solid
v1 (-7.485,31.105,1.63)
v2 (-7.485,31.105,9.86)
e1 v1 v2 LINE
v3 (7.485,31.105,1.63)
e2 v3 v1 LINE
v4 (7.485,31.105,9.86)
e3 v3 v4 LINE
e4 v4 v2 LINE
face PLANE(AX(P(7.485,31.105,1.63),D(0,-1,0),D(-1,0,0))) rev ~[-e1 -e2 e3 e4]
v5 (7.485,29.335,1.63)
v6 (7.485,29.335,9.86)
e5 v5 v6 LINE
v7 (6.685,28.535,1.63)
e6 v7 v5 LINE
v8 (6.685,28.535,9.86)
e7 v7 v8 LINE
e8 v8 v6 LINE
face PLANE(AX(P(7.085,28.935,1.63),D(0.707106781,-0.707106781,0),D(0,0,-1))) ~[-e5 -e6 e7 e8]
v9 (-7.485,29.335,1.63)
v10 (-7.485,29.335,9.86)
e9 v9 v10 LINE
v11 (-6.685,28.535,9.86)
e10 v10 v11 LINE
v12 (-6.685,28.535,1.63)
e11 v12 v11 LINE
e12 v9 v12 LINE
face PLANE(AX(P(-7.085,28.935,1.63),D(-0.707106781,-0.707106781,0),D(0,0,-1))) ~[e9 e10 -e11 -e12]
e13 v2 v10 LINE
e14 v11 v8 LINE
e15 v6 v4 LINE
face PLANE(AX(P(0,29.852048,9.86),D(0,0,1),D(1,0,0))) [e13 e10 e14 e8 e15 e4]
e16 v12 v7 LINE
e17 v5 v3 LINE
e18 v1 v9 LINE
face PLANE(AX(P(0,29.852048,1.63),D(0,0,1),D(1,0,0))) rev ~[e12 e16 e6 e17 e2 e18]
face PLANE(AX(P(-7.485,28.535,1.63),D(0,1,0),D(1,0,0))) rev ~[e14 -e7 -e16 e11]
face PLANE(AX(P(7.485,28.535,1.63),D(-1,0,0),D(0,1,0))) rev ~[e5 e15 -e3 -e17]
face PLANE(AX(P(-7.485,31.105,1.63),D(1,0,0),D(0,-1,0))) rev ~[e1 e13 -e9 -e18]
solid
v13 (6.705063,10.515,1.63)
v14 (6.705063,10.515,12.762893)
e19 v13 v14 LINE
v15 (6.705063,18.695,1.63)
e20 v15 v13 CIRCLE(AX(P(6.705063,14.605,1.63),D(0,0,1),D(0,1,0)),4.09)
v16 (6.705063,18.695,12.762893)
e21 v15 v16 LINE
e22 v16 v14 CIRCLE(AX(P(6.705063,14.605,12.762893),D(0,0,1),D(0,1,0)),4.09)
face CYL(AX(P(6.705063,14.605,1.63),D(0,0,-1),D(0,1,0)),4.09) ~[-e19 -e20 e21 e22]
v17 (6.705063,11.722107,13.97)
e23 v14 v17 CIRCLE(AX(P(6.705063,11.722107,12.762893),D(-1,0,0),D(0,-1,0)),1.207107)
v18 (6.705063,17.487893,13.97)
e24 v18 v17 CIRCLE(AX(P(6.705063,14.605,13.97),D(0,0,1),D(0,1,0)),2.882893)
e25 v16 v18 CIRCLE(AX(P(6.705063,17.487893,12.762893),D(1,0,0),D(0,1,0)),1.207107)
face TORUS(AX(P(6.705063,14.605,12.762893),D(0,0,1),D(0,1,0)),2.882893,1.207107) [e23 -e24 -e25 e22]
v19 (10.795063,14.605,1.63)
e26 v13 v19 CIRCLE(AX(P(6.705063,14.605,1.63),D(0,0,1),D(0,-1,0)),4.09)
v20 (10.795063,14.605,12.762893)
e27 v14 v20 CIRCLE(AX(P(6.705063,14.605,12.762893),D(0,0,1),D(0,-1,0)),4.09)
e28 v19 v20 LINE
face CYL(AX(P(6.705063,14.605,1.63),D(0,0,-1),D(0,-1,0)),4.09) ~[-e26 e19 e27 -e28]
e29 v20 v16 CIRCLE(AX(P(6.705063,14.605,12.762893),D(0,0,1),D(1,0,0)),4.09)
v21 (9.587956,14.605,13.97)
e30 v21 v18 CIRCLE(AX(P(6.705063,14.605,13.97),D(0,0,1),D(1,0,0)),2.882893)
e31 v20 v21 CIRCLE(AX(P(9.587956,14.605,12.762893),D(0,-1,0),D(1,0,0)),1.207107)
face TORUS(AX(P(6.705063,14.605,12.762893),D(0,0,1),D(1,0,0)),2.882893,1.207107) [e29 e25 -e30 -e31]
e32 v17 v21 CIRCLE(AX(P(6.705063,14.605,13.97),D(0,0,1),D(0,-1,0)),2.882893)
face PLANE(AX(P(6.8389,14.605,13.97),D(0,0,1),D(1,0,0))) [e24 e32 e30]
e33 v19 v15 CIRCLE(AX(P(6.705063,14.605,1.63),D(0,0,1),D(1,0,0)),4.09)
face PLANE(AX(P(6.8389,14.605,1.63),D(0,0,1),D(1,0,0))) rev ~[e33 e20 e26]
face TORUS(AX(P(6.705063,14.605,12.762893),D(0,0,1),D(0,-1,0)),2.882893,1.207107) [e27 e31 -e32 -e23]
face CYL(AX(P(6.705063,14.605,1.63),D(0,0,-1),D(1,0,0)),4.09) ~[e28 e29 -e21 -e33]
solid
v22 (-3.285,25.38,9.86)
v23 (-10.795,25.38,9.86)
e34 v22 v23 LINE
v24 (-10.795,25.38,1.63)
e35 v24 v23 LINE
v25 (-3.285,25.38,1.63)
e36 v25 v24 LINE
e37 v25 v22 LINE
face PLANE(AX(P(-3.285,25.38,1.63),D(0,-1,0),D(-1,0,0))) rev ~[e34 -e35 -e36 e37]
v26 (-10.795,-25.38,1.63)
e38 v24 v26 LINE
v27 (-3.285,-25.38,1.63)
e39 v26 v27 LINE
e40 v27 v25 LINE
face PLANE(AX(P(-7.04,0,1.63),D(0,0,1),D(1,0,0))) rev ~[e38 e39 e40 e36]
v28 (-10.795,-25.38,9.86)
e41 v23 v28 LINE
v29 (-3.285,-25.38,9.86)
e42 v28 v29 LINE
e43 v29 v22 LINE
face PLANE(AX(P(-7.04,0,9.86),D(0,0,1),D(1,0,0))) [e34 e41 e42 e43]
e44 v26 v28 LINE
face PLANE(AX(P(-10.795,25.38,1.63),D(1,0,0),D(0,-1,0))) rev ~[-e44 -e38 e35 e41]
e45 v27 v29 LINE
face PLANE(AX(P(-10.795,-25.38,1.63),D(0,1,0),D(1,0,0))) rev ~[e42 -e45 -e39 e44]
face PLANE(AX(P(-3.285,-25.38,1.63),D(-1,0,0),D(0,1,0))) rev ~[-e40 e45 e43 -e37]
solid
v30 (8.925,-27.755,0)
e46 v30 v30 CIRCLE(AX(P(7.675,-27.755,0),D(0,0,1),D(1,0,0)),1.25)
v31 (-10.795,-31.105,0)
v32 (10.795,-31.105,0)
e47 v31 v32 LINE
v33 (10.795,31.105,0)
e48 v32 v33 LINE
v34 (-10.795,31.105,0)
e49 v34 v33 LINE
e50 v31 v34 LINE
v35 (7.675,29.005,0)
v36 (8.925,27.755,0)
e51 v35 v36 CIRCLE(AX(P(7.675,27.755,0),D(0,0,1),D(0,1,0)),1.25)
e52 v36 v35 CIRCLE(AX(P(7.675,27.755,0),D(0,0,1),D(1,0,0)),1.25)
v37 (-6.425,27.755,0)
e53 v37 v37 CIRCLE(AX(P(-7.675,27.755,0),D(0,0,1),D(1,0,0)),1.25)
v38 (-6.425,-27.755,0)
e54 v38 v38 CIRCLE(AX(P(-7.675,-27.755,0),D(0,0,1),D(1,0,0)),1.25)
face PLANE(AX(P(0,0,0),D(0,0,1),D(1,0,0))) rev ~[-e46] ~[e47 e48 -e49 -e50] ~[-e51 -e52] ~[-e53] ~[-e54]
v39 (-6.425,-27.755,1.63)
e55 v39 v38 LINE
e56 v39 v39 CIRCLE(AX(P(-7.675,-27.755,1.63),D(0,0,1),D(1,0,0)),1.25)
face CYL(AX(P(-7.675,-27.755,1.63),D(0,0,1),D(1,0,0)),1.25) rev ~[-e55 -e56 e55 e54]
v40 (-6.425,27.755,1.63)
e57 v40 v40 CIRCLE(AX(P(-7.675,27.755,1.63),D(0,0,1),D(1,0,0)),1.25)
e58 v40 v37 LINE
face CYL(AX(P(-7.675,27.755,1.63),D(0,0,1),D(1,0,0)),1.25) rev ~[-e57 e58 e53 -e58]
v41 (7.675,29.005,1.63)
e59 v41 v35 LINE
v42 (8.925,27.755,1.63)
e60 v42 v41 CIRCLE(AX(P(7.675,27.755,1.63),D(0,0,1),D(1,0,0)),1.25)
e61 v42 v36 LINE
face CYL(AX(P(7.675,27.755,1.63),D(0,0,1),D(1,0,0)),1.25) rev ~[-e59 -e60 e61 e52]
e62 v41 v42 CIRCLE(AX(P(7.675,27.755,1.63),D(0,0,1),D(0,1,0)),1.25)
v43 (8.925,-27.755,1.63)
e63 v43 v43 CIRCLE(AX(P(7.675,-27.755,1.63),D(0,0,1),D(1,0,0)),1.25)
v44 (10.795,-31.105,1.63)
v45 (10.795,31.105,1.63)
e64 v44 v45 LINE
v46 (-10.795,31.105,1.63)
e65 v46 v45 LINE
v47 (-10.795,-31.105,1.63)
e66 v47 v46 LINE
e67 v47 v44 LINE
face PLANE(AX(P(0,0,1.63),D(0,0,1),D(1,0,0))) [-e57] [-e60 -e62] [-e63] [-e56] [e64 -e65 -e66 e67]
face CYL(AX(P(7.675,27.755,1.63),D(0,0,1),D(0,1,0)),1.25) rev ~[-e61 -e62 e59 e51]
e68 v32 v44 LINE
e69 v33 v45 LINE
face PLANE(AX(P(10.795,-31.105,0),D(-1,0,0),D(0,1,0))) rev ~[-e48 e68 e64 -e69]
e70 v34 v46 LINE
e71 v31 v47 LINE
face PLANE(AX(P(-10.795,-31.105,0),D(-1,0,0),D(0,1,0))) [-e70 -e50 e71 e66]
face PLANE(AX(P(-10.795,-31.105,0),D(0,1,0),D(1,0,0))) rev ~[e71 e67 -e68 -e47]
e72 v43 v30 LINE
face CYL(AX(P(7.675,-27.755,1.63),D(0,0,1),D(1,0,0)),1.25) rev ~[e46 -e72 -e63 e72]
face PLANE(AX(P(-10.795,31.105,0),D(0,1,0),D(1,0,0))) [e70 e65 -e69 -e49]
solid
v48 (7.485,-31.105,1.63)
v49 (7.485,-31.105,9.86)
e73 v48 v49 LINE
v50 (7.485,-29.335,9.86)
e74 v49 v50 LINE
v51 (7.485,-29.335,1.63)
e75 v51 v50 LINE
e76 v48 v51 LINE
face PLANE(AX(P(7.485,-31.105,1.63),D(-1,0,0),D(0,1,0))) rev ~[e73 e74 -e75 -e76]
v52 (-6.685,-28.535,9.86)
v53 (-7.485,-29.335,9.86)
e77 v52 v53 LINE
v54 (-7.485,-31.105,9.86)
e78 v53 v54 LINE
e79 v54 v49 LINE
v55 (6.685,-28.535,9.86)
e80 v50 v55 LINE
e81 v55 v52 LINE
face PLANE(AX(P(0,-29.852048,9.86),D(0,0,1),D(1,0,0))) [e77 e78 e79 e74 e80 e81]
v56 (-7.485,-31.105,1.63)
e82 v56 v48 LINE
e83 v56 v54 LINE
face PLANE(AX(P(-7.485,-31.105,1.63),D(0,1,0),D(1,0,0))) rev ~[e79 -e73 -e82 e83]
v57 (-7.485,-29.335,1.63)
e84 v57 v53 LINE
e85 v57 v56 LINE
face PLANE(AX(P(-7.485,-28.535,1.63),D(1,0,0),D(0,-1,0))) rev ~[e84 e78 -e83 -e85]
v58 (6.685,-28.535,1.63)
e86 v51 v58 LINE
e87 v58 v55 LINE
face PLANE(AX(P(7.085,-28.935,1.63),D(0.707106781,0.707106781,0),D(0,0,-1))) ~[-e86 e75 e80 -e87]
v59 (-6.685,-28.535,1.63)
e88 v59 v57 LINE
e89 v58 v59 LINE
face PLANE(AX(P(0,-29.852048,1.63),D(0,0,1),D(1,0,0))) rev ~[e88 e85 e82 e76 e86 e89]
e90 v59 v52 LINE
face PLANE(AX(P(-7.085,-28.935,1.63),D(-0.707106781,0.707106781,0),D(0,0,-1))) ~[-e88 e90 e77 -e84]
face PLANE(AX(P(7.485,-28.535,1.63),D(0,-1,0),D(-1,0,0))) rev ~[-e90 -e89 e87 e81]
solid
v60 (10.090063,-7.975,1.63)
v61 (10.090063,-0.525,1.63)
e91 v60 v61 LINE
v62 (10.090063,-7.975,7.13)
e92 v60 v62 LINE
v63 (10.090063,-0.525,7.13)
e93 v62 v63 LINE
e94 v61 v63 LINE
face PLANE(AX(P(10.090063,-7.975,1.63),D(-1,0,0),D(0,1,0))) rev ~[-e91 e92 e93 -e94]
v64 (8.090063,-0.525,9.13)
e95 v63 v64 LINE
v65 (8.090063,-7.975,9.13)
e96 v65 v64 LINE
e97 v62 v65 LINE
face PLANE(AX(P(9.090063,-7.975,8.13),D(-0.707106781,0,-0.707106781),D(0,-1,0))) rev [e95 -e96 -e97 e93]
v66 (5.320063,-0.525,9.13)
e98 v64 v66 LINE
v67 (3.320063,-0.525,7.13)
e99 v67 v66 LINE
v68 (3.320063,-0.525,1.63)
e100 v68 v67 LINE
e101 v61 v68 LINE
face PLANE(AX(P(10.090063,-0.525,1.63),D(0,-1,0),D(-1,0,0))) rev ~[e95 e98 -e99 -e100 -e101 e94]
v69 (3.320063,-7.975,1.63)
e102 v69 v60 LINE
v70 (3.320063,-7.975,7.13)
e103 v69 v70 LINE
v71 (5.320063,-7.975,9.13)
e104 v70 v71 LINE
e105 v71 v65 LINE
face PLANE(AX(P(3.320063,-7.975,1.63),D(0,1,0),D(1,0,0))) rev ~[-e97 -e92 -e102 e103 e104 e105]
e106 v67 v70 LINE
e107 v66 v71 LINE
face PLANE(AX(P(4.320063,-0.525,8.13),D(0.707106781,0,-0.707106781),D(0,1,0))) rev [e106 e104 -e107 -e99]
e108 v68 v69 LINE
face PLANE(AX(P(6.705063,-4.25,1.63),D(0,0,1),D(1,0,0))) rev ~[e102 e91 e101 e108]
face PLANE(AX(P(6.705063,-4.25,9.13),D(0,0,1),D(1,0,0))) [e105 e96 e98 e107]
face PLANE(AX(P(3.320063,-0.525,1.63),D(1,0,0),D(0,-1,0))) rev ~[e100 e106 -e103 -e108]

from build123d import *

# Parameters (mm, degrees)
F0_W       = 21.59
F0_H       = 62.21
F1_DEPTH   = 1.63
F4_DEPTH   = 12.34
F5_DEPTH   = 7.5
F2_R       = 1.25
F6_DEPTH   = 25
F7_SIZE    = 2
F8_R       = 1.2071067812
F10_DEPTH  = 8.23
F12_DEPTH  = 8.23
F13_SIZE   = 0.8
F13_2_SIZE = 0.8


with BuildPart() as f1:
    # F0 (on Top) → F1 (new body)
    with BuildSketch(Plane.XY):
        Rectangle(F0_W, F0_H)
    extrude(amount=F1_DEPTH)

    # F2 (on face) → F6 (cut)
    with BuildSketch(Plane.XY.offset(1.63)):
        with BuildLine():
            ThreePointArc((7.675, 29.005), (6.7911165235, 26.8711165235), (8.925, 27.755))
            Line((8.925, 27.755), (7.675, 27.755))
            Line((7.675, 27.755), (7.675, 29.005))
        make_face()
        with BuildLine():
            Line((7.675, 27.755), (8.925, 27.755))
            ThreePointArc((8.925, 27.755), (8.5588834765, 28.6388834765), (7.675, 29.005))
            Line((7.675, 29.005), (7.675, 27.755))
        make_face()
        with Locations((-7.675, 27.755)):
            Circle(F2_R)
        with Locations((-7.675, -27.755)):
            Circle(F2_R)
        with Locations((7.675, -27.755)):
            Circle(F2_R)
    extrude(amount=-F6_DEPTH, mode=Mode.SUBTRACT)


with BuildPart() as f4:
    # F3 (on face) → F4 (new body)
    with BuildSketch(Plane.XY.offset(1.63)):
        with BuildLine():
            ThreePointArc((10.7950629295, 14.605), (9.5971296646, 17.4970667351), (6.7050629295, 18.695))
            ThreePointArc((6.7050629295, 18.695), (2.6150629295, 14.605), (6.7050629295, 10.515))
            ThreePointArc((6.7050629295, 10.515), (9.5971296646, 11.7129332649), (10.7950629295, 14.605))
        make_face()
    extrude(amount=F4_DEPTH)

    # F8
    f8_edges = [f4.edges().sort_by_distance(p)[0] for p in [
        (6.705063, 18.695, 13.97),
    ]]
    fillet(f8_edges, radius=F8_R)


with BuildPart() as f5:
    # F3 (on face) → F5 (new body)
    with BuildSketch(Plane.XY.offset(1.63)):
        Polygon((10.0900629295, -0.525), (6.7050629295, -0.525), (3.3200629295, -0.525), (3.3200629295, -7.975), (10.0900629295, -7.975), align=None)
    extrude(amount=F5_DEPTH)

    # F7
    f7_edges = [f5.edges().sort_by_distance(p)[0] for p in [
        (3.320063, -4.25, 9.13),
        (10.090063, -4.25, 9.13),
    ]]
    chamfer(f7_edges, length=F7_SIZE)


with BuildPart() as f10:
    # F9 (on face) → F10 (new body)
    with BuildSketch(Plane.XY.offset(1.63)):
        Polygon((-10.795, 25.38), (-10.795, 0), (-10.795, -25.38), (-3.285, -25.38), (-3.285, 25.38), align=None)
    extrude(amount=F10_DEPTH)


with BuildPart() as f12:
    # F11 (on face) → F12 (new body)
    with BuildSketch(Plane.XY.offset(1.63)):
        with BuildLine():
            Line((7.485, 31.105), (0, 31.105))
            Line((0, 31.105), (-7.485, 31.105))
            Line((-7.485, 31.105), (-7.485, 28.9904756169))
            ThreePointArc((-7.485, 28.9904756169), (-7.0487343616, 28.8368000509), (-6.6982195743, 28.535))
            Line((-6.6982195743, 28.535), (6.6982195743, 28.535))
            ThreePointArc((6.6982195743, 28.535), (7.0487343616, 28.8368000509), (7.485, 28.9904756169))
            Line((7.485, 28.9904756169), (7.485, 31.105))
        make_face()
        with BuildLine():
            Line((7.485, 28.535), (7.485, 28.9904756169))
            ThreePointArc((7.485, 28.9904756169), (7.0487343616, 28.8368000509), (6.6982195743, 28.535))
            Line((6.6982195743, 28.535), (7.485, 28.535))
        make_face()
        with BuildLine():
            ThreePointArc((-6.6982195743, 28.535), (-7.0487343616, 28.8368000509), (-7.485, 28.9904756169))
            Line((-7.485, 28.9904756169), (-7.485, 28.535))
            Line((-7.485, 28.535), (-6.6982195743, 28.535))
        make_face()
    extrude(amount=F12_DEPTH)

    # F13
    f13_edges = [f12.edges().sort_by_distance(p)[0] for p in [
        (-7.485, 28.535, 5.745),
        (7.485, 28.535, 5.745),
    ]]
    chamfer(f13_edges, length=F13_SIZE)


with BuildPart() as f12b:
    # F11 (on face) → F12, piece 2 (new body)
    with BuildSketch(Plane.XY.offset(1.63)):
        with BuildLine():
            Line((-7.485, -28.9904756169), (-7.485, -31.105))
            Line((-7.485, -31.105), (0, -31.105))
            Line((0, -31.105), (7.485, -31.105))
            Line((7.485, -31.105), (7.485, -28.9904756169))
            ThreePointArc((7.485, -28.9904756169), (7.0487343616, -28.8368000509), (6.6982195743, -28.535))
            Line((6.6982195743, -28.535), (-6.6982195743, -28.535))
            ThreePointArc((-6.6982195743, -28.535), (-7.0487343616, -28.8368000509), (-7.485, -28.9904756169))
        make_face()
        with BuildLine():
            ThreePointArc((6.6982195743, -28.535), (7.0487343616, -28.8368000509), (7.485, -28.9904756169))
            Line((7.485, -28.9904756169), (7.485, -28.535))
            Line((7.485, -28.535), (6.6982195743, -28.535))
        make_face()
        with BuildLine():
            Line((-7.485, -28.535), (-7.485, -28.9904756169))
            ThreePointArc((-7.485, -28.9904756169), (-7.0487343616, -28.8368000509), (-6.6982195743, -28.535))
            Line((-6.6982195743, -28.535), (-7.485, -28.535))
        make_face()
    extrude(amount=F12_DEPTH)

    # F13#2
    f13_2_edges = [f12b.edges().sort_by_distance(p)[0] for p in [
        (-7.485, -28.535, 5.745),
        (7.485, -28.535, 5.745),
    ]]
    chamfer(f13_2_edges, length=F13_2_SIZE)


solid = Compound([f1.part, f4.part, f5.part, f10.part, f12.part, f12b.part])
